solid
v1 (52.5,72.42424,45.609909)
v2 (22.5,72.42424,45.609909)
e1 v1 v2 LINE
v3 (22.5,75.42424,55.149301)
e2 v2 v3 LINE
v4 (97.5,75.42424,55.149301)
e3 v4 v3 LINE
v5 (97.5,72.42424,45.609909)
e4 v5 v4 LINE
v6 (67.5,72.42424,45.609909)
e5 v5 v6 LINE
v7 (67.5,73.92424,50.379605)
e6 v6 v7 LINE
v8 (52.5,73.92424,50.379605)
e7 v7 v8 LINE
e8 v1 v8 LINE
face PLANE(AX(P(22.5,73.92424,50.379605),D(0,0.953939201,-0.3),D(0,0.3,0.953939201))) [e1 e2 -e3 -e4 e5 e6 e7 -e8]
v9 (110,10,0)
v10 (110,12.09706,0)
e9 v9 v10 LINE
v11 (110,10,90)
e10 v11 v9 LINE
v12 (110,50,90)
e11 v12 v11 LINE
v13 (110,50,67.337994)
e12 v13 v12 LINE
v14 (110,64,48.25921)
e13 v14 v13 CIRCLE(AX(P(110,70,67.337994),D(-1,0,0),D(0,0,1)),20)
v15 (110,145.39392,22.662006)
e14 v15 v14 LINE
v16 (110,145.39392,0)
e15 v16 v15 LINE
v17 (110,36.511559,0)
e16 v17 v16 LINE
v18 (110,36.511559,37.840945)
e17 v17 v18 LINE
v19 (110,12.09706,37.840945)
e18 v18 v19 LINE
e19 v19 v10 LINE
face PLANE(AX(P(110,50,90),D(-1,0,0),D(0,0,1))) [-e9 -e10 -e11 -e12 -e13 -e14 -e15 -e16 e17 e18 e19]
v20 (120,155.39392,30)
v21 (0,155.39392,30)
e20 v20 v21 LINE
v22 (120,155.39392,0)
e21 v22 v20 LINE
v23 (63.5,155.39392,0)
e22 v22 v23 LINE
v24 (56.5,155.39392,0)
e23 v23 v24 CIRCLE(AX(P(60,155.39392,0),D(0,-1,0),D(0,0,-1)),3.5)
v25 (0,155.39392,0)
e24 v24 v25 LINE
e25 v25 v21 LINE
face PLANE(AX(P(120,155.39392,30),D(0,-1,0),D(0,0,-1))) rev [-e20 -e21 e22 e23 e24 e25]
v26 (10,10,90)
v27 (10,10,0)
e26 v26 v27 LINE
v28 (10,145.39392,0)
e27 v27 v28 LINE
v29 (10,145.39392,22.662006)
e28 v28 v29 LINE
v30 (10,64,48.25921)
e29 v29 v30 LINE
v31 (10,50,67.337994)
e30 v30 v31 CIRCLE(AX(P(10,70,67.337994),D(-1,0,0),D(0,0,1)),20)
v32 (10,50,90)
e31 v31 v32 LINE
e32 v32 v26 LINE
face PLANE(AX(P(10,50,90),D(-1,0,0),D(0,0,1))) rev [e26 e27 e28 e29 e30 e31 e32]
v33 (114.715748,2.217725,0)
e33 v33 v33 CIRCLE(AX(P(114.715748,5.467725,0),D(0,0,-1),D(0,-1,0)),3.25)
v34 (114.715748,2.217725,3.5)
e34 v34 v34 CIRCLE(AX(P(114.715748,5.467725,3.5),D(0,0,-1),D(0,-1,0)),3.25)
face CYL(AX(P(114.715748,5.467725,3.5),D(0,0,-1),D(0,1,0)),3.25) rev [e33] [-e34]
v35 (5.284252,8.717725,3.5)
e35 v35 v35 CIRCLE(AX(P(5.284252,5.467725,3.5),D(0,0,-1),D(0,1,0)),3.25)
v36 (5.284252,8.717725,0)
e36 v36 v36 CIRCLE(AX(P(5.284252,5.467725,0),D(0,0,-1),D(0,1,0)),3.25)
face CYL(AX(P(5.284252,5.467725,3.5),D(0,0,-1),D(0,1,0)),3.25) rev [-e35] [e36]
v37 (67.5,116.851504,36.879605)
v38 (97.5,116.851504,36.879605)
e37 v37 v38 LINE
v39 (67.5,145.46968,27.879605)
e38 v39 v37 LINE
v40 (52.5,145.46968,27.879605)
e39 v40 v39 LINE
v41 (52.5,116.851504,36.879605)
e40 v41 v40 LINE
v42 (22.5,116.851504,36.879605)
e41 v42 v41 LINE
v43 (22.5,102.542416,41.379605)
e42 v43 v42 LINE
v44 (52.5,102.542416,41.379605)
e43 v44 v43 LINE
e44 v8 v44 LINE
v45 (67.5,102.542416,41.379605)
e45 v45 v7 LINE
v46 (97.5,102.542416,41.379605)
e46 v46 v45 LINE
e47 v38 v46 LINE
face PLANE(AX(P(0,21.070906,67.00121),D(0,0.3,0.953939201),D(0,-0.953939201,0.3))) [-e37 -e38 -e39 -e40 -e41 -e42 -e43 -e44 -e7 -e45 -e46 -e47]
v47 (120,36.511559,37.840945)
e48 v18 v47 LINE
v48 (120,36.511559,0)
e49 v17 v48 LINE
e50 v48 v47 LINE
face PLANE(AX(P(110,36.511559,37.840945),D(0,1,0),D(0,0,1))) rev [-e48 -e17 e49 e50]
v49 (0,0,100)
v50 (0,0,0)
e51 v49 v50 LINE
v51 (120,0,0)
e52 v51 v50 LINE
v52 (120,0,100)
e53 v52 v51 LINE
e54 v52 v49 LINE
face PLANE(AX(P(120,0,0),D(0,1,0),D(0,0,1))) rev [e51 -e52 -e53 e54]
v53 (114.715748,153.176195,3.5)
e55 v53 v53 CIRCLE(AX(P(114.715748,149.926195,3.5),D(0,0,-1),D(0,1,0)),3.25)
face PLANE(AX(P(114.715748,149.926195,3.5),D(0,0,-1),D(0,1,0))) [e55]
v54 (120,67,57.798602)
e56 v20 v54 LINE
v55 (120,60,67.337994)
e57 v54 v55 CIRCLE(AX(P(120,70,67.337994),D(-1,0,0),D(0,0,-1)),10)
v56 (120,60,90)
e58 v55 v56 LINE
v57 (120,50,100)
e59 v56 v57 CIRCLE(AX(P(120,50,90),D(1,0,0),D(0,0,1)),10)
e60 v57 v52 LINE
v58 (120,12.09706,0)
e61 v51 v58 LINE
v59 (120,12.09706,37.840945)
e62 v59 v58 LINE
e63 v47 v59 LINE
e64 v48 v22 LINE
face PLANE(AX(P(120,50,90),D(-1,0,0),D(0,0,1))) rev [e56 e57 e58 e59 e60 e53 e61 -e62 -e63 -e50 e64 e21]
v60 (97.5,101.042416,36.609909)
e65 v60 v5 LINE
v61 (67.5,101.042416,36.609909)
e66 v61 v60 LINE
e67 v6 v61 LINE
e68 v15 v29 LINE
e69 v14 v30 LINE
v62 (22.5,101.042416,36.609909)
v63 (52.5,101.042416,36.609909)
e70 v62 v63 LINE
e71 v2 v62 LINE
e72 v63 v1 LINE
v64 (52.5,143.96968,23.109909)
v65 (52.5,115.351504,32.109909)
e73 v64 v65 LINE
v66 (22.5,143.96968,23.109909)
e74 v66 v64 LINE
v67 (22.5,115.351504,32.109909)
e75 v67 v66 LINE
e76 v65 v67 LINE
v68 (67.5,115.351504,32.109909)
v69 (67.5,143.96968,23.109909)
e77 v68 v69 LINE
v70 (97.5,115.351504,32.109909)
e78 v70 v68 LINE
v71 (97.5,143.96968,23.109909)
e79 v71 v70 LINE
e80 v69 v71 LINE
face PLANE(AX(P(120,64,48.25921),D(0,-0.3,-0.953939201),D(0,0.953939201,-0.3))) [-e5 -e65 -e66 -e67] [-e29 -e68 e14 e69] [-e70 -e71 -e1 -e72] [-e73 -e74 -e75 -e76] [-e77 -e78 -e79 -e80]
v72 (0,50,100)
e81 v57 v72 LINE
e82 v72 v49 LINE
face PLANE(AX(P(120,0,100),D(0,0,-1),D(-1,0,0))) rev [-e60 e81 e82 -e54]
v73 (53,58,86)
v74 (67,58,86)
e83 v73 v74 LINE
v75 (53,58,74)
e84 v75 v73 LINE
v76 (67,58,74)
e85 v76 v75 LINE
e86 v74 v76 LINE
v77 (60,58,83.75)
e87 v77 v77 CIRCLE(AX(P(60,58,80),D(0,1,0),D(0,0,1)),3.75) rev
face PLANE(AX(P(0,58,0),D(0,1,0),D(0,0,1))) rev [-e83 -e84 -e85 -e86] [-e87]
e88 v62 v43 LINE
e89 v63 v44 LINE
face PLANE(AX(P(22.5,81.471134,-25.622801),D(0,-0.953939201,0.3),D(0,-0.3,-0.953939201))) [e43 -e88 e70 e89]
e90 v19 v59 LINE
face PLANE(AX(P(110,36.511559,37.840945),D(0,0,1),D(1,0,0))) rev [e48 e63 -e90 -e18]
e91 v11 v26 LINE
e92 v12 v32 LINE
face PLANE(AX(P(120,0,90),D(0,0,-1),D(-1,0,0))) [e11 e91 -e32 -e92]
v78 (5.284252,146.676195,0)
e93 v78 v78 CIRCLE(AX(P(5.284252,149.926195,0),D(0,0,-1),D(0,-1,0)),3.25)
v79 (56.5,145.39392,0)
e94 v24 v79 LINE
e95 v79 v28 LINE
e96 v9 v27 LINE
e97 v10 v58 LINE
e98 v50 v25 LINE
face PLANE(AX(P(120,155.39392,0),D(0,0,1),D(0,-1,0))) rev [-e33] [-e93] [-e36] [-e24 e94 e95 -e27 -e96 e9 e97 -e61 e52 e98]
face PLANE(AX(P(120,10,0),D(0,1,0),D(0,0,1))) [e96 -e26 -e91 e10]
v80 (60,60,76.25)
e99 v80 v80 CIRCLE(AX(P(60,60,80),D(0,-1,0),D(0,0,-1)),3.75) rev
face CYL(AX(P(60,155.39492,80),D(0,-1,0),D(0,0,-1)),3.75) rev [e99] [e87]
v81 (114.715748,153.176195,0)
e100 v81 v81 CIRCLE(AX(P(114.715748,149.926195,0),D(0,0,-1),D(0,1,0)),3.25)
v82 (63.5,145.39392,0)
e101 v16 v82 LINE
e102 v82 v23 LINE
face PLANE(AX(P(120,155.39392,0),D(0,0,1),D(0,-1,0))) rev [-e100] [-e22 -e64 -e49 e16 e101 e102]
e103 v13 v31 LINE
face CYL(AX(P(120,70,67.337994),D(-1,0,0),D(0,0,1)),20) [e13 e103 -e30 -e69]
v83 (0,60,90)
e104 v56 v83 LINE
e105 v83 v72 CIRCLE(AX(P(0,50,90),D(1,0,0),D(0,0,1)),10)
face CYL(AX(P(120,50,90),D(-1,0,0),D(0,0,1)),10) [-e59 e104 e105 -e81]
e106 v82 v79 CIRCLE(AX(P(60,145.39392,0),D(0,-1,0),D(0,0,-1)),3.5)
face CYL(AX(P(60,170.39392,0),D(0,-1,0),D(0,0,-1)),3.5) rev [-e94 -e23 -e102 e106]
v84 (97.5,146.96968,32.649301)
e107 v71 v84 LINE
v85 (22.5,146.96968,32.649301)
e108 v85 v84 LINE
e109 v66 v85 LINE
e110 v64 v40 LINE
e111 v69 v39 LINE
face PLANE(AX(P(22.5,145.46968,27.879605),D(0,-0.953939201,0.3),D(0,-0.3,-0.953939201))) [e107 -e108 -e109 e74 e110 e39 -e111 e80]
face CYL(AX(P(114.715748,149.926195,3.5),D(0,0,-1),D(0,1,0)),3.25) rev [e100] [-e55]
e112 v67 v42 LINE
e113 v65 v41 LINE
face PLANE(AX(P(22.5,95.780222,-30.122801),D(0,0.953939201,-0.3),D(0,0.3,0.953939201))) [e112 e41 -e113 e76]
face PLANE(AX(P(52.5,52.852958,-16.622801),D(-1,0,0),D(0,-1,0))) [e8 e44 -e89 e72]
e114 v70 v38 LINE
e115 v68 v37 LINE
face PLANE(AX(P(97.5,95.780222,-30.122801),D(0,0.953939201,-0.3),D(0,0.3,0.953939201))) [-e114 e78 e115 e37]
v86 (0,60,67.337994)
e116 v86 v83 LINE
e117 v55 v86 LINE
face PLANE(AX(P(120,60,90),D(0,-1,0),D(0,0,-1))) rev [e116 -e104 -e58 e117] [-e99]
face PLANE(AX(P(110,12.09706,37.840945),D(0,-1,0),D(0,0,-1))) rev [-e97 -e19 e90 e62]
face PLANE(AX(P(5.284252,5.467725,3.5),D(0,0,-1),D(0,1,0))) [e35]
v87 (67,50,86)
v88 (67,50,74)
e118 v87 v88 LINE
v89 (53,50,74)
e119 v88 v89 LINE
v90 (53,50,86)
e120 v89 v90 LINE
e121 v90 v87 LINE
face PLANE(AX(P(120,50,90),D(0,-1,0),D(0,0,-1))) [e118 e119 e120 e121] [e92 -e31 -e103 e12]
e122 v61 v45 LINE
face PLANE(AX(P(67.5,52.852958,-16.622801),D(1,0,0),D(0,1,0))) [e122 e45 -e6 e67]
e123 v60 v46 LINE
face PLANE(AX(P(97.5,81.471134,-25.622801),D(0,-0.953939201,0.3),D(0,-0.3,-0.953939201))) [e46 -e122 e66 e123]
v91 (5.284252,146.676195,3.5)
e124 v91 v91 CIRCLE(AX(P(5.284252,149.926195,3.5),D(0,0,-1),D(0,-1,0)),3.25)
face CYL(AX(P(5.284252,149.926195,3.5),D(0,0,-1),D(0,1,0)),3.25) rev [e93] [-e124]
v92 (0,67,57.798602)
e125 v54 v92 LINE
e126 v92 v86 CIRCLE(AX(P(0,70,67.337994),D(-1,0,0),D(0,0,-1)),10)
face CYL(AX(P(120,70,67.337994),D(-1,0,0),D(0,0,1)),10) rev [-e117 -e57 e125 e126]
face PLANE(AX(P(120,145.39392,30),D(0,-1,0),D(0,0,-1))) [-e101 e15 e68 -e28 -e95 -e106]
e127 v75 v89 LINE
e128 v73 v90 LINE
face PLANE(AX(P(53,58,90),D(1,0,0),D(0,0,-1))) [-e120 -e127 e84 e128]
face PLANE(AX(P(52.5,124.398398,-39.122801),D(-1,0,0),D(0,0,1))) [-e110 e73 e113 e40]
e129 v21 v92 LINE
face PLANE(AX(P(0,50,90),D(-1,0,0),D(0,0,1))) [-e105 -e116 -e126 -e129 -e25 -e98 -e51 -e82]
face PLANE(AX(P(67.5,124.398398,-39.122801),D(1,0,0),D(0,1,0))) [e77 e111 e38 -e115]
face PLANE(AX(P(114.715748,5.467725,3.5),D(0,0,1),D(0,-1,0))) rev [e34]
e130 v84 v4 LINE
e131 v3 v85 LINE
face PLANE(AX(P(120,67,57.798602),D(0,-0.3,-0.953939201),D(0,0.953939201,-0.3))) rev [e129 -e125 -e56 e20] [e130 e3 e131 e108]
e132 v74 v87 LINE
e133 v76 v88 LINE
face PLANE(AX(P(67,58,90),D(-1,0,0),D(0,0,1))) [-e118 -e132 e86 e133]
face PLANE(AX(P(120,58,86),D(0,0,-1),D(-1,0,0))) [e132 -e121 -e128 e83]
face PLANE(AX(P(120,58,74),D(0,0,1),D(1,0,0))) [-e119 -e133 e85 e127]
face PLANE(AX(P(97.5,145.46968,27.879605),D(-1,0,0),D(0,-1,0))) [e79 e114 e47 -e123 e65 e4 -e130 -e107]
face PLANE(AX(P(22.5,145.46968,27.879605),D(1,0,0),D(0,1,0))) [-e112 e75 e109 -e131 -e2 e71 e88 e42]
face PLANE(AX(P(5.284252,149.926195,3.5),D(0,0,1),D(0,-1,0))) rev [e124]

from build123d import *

# Parameters (mm, degrees)
BOSS_EXTRU_1_DEPTH      = 120
COQUE1_START            = 10
COQUE1_DEPTH            = 100
ESQUISSE3_W             = 75
ESQUISSE3_H             = 75
ENL_V_MAT_EXTRU_1_DEPTH = 5
ENL_V_MAT_EXTRU_2_REACH = 194.855
ESQUISSE4_W             = 30
ESQUISSE4_H             = 30
ESQUISSE5_R             = 3.25
ENL_V_MAT_EXTRU_3_DEPTH = 3.5
ENL_V_START             = 50
ESQUISSE6_R             = 3.75
ENL_V_MAT_EXTRU_4_DEPTH = 10
ESQUISSE7_W             = 14
ESQUISSE7_H             = 12
ENL_V_MAT_EXTRU_5_DEPTH = 8
ESQUISSE8_W             = 37.840944821
ESQUISSE8_H             = 24.41449918
ENL_V_MAT_EXTRU_6_DEPTH = 10
ENL_V_START_2           = 145.39392
ESQUISSE9_R             = 3.5
ENL_V_MAT_EXTRU_8_DEPTH = 25


# Read off the part's stored shape, not the designer's step: Coque1
with BuildPart() as part:
    # Esquisse1 → Boss.-Extru.1 (new body)
    with BuildSketch(Plane(origin=(0, 0, 0), x_dir=(0, 0, -1), z_dir=(1, 0, 0))):
        with BuildLine():
            Line((0, 0), (-100, 0))
            Line((-100, 0), (-100, 50))
            ThreePointArc((-100, 50), (-97.071067812, 57.071067812), (-90, 60))
            Line((-90, 60), (-67.337993857, 60))
            ThreePointArc((-67.337993857, 60), (-61.421914074, 61.937742252), (-57.798601843, 67))
            Line((-57.798601843, 67), (-30, 155.393920142))
            Line((-30, 155.393920142), (0, 155.393920142))
            Line((0, 155.393920142), (0, 0))
        make_face()
    extrude(amount=BOSS_EXTRU_1_DEPTH)

    # Coque1 outline → Coque1 (cut)
    with BuildSketch(Plane.YZ.offset(COQUE1_START)):
        with BuildLine():
            Line((145.393920142, 0), (145.393920142, 22.662006143))
            Line((145.393920142, 22.662006143), (64, 48.259209829))
            ThreePointArc((64, 48.259209829), (53.875484503, 55.505834291), (50, 67.337993857))
            Line((50, 67.337993857), (50, 90))
            Line((50, 90), (10, 90))
            Line((10, 90), (10, 0))
            Line((10, 0), (145.393920142, 0))
        make_face()
    extrude(amount=COQUE1_DEPTH, mode=Mode.SUBTRACT)

    # Esquisse3 → Enlèv. mat.-Extru.1 (cut)
    with BuildSketch(Plane(origin=(0, 22.570905626, 71.770905626), x_dir=(-1, 0, 0), z_dir=(0, -0.3000000000000002, -0.9539392014169457))):
        with Locations((-60, 92.905349014)):
            Rectangle(ESQUISSE3_W, ESQUISSE3_H)
    extrude(amount=ENL_V_MAT_EXTRU_1_DEPTH, mode=Mode.SUBTRACT)

    # Esquisse4 → Enlèv. mat.-Extru.2 (cut, up to next)
    with BuildSketch(Plane(origin=(0, 22.570905626, 71.770905626), x_dir=(-1, 0, 0), z_dir=(0, -0.3000000000000002, -0.9539392014169457)), mode=Mode.PRIVATE) as enl_v_mat_extru_2_sk1:
        with Locations((-37.5, 115.405349014)):
            Rectangle(ESQUISSE4_W, ESQUISSE4_H)
    enl_v_mat_extru_2_tool1 = extrude(enl_v_mat_extru_2_sk1.sketch, amount=ENL_V_MAT_EXTRU_2_REACH, mode=Mode.PRIVATE) & part.part
    # Esquisse4 → Enlèv. mat.-Extru.2 (cut, up to next)
    with BuildSketch(Plane(origin=(0, 22.570905626, 71.770905626), x_dir=(-1, 0, 0), z_dir=(0, -0.3000000000000002, -0.9539392014169457)), mode=Mode.PRIVATE) as enl_v_mat_extru_2_sk2:
        with Locations((-37.5, 70.405349014)):
            Rectangle(ESQUISSE4_W, ESQUISSE4_H)
    enl_v_mat_extru_2_tool2 = extrude(enl_v_mat_extru_2_sk2.sketch, amount=ENL_V_MAT_EXTRU_2_REACH, mode=Mode.PRIVATE) & part.part
    # Esquisse4 → Enlèv. mat.-Extru.2 (cut, up to next)
    with BuildSketch(Plane(origin=(0, 22.570905626, 71.770905626), x_dir=(-1, 0, 0), z_dir=(0, -0.3000000000000002, -0.9539392014169457)), mode=Mode.PRIVATE) as enl_v_mat_extru_2_sk3:
        with Locations((-82.5, 115.405349014)):
            Rectangle(ESQUISSE4_W, ESQUISSE4_H)
    enl_v_mat_extru_2_tool3 = extrude(enl_v_mat_extru_2_sk3.sketch, amount=ENL_V_MAT_EXTRU_2_REACH, mode=Mode.PRIVATE) & part.part
    # Esquisse4 → Enlèv. mat.-Extru.2 (cut, up to next)
    with BuildSketch(Plane(origin=(0, 22.570905626, 71.770905626), x_dir=(-1, 0, 0), z_dir=(0, -0.3000000000000002, -0.9539392014169457)), mode=Mode.PRIVATE) as enl_v_mat_extru_2_sk4:
        with Locations((-82.5, 70.405349014)):
            Rectangle(ESQUISSE4_W, ESQUISSE4_H)
    enl_v_mat_extru_2_tool4 = extrude(enl_v_mat_extru_2_sk4.sketch, amount=ENL_V_MAT_EXTRU_2_REACH, mode=Mode.PRIVATE) & part.part
    add(enl_v_mat_extru_2_tool1.solids().sort_by_distance((37.5, 132.660592, 37.149301))[0], mode=Mode.SUBTRACT)
    add(enl_v_mat_extru_2_tool2.solids().sort_by_distance((37.5, 89.733328, 50.649301))[0], mode=Mode.SUBTRACT)
    add(enl_v_mat_extru_2_tool3.solids().sort_by_distance((82.5, 132.660592, 37.149301))[0], mode=Mode.SUBTRACT)
    add(enl_v_mat_extru_2_tool4.solids().sort_by_distance((82.5, 89.733328, 50.649301))[0], mode=Mode.SUBTRACT)

    # Esquisse5 → Enlèv. mat.-Extru.3 (cut)
    with BuildSketch(Plane(origin=(0, 0, 0), x_dir=(-1, 0, 0), z_dir=(0, 0, -1))):
        with Locations(Location((-114.715748307, 149.926194797, 0), (0, 0, 90))):
            Circle(ESQUISSE5_R)
        with Locations(Location((-5.284251693, 149.926194797, 0), (0, 0, 270))):
            Circle(ESQUISSE5_R)
        with Locations(Location((-5.284251693, 5.467725345, 0), (0, 0, 90))):
            Circle(ESQUISSE5_R)
        with Locations(Location((-114.715748307, 5.467725345, 0), (0, 0, 270))):
            Circle(ESQUISSE5_R)
    extrude(amount=-ENL_V_MAT_EXTRU_3_DEPTH, mode=Mode.SUBTRACT)

    # Esquisse6 → Enlèv. mat.-Extru.4 (cut)
    with BuildSketch(Plane(origin=(0, 0, 0), x_dir=(1, 0, 0), z_dir=(0, 1, 0)).offset(ENL_V_START)):
        with Locations(Location((60, -80, 0), (0, 0, 90))):
            Circle(ESQUISSE6_R)
    extrude(amount=ENL_V_MAT_EXTRU_4_DEPTH, mode=Mode.SUBTRACT)

    # Esquisse7 → Enlèv. mat.-Extru.5 (cut)
    with BuildSketch(Plane(origin=(0, 0, 0), x_dir=(1, 0, 0), z_dir=(0, 1, 0)).offset(ENL_V_START)):
        with Locations((60, -80)):
            Rectangle(ESQUISSE7_W, ESQUISSE7_H)
    extrude(amount=ENL_V_MAT_EXTRU_5_DEPTH, mode=Mode.SUBTRACT)

    # Esquisse8 → Enlèv. mat.-Extru.6 (cut)
    with BuildSketch(Plane(origin=(120, 0, 0), x_dir=(0, 0, -1), z_dir=(1, 0, 0))):
        with Locations((-18.920472411, 24.304309827)):
            Rectangle(ESQUISSE8_W, ESQUISSE8_H)
    extrude(amount=-ENL_V_MAT_EXTRU_6_DEPTH, mode=Mode.SUBTRACT)

    # Esquisse9 → Enlèv. mat.-Extru.8 (cut)
    with BuildSketch(Plane(origin=(0, 0, 0), x_dir=(1, 0, 0), z_dir=(0, 1, 0)).offset(ENL_V_START_2)):
        with Locations((60, 0)):
            Circle(ESQUISSE9_R)
    extrude(amount=ENL_V_MAT_EXTRU_8_DEPTH, mode=Mode.SUBTRACT)


solid = part.part
